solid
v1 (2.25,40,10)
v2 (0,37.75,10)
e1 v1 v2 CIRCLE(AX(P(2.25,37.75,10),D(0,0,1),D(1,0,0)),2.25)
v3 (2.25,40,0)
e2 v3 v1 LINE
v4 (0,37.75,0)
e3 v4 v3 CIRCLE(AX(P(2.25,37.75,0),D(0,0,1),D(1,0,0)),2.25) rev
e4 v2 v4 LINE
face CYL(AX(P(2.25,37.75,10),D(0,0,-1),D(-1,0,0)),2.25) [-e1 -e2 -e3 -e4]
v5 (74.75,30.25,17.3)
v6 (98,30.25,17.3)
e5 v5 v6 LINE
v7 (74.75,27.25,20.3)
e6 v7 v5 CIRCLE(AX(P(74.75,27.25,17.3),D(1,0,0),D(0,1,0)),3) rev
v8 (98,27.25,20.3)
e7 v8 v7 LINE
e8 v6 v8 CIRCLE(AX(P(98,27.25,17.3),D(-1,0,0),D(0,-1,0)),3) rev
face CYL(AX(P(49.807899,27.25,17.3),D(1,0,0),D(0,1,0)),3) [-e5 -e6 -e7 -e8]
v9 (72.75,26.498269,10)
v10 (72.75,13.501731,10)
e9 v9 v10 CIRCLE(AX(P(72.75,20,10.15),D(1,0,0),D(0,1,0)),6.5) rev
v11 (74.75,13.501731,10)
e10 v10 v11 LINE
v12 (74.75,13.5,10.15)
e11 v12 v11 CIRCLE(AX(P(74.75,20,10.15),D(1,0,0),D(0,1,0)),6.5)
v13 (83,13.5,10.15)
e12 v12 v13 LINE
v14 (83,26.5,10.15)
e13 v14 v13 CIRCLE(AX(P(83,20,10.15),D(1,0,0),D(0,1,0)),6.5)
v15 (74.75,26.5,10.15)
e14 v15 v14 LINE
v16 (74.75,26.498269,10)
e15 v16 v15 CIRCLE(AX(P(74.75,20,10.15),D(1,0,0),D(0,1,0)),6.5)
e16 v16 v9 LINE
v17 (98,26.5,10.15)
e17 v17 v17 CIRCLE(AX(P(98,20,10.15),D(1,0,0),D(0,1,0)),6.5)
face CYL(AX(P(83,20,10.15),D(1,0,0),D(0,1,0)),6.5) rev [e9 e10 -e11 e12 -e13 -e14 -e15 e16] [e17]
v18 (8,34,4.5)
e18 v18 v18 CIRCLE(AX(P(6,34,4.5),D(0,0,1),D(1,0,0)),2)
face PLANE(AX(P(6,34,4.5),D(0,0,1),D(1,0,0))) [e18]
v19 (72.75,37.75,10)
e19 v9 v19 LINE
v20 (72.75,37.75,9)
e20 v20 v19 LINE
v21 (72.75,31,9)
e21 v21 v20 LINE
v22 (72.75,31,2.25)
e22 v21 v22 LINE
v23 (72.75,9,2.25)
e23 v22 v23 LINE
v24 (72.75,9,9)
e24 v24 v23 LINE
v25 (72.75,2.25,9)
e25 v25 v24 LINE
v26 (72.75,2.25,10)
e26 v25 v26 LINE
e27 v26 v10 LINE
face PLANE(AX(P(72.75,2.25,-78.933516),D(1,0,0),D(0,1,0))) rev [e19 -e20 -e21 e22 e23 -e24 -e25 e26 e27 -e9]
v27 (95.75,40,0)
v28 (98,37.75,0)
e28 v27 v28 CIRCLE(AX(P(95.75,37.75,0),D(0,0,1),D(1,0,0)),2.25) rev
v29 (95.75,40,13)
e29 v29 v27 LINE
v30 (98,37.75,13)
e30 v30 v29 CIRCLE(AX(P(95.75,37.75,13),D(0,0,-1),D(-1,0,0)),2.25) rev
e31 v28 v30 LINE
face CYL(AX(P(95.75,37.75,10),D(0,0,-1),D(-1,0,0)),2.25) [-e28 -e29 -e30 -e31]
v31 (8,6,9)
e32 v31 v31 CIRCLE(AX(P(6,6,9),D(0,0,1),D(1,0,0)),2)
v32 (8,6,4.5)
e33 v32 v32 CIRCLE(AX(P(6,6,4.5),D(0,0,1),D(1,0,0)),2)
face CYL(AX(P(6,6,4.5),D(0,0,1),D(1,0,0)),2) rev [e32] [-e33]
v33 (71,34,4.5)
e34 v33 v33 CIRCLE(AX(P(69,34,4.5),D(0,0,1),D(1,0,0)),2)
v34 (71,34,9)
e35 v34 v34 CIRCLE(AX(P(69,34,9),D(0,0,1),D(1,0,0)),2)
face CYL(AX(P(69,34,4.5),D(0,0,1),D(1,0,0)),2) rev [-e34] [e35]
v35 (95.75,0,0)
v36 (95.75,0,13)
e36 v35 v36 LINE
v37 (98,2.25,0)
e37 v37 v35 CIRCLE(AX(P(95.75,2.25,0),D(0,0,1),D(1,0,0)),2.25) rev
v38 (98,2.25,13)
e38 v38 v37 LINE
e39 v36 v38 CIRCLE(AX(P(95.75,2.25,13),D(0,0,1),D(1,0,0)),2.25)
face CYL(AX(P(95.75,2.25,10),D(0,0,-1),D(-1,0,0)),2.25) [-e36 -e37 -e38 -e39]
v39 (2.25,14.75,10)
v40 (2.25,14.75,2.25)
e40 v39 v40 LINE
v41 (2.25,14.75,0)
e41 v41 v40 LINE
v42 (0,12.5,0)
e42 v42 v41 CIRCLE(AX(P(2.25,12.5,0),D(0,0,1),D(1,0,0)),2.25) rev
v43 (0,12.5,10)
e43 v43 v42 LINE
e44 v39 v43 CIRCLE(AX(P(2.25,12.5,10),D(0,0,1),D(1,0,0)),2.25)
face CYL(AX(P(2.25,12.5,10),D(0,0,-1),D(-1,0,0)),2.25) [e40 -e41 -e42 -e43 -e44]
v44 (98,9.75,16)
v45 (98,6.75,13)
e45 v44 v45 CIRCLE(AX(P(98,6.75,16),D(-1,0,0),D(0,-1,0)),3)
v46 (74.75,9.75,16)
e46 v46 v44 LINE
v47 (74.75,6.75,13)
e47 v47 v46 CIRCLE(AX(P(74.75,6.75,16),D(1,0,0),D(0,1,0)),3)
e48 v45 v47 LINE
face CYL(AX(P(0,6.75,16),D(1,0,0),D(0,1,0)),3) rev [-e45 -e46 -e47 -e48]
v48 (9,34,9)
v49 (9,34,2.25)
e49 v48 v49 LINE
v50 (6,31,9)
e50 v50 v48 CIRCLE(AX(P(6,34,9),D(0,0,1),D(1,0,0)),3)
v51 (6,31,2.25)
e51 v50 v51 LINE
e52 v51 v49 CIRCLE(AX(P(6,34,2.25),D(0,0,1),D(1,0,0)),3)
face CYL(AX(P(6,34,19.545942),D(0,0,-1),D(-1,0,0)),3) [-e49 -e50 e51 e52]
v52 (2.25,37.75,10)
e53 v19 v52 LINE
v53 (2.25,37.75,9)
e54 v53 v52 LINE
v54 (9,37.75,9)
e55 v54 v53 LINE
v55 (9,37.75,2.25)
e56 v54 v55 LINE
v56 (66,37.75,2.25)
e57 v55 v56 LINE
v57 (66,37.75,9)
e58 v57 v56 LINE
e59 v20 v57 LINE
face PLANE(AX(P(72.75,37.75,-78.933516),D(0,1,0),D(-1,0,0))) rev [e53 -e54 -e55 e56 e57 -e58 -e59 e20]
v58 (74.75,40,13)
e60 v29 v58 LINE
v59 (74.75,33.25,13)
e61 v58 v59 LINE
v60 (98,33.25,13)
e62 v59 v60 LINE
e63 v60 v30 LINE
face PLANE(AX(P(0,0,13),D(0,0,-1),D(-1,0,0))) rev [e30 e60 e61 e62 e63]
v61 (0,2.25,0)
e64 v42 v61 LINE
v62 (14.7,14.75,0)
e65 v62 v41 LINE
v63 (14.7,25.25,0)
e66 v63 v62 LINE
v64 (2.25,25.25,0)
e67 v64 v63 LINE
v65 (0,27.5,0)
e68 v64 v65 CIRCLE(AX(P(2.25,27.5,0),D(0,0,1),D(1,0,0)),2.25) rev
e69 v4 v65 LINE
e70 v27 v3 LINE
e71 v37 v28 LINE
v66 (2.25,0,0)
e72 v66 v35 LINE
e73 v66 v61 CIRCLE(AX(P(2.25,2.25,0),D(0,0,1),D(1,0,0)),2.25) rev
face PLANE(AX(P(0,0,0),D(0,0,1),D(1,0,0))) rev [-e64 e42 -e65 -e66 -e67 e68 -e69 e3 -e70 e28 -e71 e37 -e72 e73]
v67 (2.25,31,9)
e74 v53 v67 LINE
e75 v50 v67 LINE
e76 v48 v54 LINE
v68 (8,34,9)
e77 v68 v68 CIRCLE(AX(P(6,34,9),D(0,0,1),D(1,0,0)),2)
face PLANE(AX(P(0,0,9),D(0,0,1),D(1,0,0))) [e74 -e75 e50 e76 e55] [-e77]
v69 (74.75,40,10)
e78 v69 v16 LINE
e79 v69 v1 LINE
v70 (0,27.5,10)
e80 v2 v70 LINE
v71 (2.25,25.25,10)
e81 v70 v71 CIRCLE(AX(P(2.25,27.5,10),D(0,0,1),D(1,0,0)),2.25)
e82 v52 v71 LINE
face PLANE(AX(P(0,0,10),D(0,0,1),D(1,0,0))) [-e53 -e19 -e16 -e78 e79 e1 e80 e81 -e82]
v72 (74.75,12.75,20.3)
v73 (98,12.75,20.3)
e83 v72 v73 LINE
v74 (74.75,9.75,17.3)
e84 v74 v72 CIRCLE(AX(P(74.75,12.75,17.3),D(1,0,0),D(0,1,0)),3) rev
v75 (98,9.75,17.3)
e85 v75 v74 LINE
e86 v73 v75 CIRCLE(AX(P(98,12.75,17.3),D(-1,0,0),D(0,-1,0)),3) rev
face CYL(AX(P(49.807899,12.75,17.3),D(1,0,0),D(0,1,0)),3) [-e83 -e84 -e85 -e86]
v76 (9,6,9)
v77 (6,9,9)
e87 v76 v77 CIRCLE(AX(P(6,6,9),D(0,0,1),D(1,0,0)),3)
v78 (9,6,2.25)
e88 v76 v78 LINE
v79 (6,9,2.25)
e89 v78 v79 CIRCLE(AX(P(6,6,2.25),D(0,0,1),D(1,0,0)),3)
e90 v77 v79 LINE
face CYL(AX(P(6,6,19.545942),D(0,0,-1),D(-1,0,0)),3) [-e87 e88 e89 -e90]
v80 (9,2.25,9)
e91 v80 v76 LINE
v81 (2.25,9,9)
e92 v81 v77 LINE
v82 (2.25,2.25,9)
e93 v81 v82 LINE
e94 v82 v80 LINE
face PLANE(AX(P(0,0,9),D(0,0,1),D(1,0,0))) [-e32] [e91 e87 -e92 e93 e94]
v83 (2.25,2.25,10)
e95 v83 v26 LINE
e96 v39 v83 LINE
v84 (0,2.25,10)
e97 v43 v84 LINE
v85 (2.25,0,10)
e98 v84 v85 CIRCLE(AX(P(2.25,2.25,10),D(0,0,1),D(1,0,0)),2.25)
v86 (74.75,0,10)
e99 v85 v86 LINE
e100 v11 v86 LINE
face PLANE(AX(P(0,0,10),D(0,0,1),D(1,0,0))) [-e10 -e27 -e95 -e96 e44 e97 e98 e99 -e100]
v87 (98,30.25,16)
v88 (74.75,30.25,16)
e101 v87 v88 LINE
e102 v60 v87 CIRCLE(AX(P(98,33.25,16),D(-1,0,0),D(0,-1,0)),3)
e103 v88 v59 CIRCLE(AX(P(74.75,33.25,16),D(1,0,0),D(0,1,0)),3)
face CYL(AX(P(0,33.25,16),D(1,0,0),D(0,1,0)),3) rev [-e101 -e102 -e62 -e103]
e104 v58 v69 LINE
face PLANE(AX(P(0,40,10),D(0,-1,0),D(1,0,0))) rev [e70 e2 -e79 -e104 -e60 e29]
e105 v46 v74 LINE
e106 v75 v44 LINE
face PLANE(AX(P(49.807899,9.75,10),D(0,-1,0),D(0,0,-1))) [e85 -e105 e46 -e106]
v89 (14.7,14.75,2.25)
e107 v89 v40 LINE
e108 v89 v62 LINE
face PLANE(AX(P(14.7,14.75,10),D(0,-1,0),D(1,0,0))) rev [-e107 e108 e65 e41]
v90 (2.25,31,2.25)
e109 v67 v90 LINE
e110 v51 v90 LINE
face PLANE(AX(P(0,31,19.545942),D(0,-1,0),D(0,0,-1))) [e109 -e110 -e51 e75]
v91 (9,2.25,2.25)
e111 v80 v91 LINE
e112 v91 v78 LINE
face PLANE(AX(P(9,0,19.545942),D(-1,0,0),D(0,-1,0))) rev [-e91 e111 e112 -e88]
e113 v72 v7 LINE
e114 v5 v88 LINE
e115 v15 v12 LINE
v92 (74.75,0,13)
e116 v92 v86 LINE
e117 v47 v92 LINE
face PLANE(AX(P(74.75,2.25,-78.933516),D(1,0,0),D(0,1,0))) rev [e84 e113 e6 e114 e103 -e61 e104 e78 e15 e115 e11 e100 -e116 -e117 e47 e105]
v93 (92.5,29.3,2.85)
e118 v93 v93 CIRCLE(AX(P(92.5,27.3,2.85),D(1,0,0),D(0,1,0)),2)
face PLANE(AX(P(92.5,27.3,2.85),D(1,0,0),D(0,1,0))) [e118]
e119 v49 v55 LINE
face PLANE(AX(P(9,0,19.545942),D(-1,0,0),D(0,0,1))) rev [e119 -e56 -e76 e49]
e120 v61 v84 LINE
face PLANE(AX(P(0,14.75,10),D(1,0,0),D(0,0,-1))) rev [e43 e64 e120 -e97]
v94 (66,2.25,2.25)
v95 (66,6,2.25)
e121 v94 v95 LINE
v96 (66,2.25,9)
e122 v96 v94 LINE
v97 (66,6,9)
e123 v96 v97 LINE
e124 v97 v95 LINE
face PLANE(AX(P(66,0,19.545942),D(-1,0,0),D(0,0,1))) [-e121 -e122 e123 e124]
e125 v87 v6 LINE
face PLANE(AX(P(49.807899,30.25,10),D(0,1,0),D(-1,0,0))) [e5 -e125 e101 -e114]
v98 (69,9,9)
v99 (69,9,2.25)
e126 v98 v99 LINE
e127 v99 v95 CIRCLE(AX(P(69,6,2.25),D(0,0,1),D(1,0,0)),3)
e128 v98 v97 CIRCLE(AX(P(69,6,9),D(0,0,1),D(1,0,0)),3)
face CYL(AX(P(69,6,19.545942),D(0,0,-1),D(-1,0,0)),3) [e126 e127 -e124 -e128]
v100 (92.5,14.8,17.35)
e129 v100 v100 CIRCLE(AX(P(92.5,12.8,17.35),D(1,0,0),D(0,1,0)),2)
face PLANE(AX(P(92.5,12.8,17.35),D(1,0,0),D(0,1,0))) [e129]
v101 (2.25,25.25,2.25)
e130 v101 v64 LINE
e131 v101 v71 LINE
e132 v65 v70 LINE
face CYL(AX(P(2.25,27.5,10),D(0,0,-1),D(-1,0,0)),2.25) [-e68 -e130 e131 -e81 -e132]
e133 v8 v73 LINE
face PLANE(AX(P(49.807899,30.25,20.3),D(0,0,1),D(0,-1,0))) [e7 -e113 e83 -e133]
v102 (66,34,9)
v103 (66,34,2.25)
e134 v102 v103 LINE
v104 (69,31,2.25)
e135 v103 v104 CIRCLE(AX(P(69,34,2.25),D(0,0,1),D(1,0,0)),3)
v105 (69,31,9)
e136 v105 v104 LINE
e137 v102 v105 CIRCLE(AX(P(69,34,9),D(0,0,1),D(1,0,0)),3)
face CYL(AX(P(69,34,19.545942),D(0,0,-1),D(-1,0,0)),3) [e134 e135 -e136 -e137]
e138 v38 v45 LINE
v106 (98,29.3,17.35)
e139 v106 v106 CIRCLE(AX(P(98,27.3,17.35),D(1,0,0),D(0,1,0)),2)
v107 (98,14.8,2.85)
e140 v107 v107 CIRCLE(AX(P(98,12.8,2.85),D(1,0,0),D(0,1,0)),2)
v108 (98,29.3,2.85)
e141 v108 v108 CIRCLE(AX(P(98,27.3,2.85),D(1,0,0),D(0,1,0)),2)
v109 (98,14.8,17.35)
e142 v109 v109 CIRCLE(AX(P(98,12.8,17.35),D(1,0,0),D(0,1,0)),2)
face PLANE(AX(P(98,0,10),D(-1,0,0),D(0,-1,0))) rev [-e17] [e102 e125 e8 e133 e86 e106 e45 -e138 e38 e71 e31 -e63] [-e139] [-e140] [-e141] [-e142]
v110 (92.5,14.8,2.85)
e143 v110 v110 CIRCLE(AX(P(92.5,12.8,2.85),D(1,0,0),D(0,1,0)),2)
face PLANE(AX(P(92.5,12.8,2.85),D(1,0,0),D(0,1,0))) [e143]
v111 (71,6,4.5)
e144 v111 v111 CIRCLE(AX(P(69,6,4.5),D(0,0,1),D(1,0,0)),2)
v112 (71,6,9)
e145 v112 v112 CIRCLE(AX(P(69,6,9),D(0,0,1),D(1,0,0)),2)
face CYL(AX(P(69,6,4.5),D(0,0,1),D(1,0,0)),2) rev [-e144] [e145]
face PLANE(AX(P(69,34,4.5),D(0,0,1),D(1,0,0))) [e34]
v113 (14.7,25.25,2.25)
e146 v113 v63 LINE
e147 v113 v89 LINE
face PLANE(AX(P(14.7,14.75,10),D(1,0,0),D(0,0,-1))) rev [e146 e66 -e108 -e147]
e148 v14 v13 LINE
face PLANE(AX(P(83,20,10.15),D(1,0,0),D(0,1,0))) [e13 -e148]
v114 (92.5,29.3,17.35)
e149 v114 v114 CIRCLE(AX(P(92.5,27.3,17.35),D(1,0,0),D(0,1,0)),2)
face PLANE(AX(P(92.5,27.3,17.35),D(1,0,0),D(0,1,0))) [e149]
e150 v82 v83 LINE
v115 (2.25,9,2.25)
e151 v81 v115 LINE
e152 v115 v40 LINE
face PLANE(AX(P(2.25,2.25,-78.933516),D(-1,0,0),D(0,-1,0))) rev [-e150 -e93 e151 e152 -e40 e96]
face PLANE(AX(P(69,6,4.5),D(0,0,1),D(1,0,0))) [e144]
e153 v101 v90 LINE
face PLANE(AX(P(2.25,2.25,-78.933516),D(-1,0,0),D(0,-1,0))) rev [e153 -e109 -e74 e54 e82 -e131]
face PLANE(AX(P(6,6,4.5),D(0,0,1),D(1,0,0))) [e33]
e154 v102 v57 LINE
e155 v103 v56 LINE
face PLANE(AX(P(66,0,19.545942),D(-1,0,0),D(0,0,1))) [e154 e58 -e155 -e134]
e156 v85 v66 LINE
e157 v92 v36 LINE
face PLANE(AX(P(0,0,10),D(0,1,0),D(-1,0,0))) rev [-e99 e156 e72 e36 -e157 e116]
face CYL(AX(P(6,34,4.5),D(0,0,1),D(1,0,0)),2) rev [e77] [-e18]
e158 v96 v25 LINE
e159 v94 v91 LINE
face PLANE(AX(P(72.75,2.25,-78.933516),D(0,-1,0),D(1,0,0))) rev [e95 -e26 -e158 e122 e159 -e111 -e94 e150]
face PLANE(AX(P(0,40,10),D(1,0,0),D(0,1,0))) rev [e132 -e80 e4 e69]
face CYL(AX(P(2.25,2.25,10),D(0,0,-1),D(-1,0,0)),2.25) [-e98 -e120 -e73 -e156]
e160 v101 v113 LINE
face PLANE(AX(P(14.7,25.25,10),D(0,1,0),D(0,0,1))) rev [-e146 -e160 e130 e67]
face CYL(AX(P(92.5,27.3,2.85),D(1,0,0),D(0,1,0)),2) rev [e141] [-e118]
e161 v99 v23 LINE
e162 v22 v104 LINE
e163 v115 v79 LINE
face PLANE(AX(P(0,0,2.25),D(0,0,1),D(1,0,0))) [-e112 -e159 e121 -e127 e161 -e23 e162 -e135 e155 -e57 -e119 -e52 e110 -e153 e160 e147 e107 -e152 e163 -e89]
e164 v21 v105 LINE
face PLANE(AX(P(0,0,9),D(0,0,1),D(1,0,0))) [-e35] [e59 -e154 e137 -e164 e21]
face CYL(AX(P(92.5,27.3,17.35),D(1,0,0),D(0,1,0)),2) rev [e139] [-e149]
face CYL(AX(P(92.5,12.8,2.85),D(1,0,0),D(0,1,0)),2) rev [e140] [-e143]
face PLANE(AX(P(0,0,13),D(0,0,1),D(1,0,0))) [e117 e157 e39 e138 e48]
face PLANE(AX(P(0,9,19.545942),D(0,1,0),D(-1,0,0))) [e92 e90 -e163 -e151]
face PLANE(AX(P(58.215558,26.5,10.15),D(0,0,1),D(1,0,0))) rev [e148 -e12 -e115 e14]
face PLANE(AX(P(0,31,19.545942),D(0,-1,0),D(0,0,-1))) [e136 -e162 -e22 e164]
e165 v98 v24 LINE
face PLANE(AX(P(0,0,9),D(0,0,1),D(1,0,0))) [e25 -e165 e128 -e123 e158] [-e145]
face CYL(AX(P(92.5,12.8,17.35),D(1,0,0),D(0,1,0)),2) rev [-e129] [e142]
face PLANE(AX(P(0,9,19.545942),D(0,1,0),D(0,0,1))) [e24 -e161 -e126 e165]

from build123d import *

# Parameters (mm, degrees)
BODY_DEPTH          = 10
PCB_RECESS_DEPTH    = 7.75
SKETCH11_R          = 3.000000000000004
SKETCH11_R_2        = 2.999999999999999
SKETCH11_R_3        = 3.000000000000008
SKETCH11_R_4        = 3.0000000000000084
PCB_BOSS_DEPTH      = 6.75
FILLET2_R           = 2.25
BOSS_EXTRUDE2_DEPTH = 23.25
BOSS_EXTRUDE3_DEPTH = 3
SKETCH25_R          = 6.5
CUT_EXTRUDE9_DEPTH  = 15
CUT_EXTRUDE10_DEPTH = 10.25
FILLET7_R           = 3
FILLET8_R           = 2.25
SKETCH27_R          = 2.0000000000000067
SKETCH27_R_2        = 2.000000000000003
SKETCH27_R_3        = 2
SKETCH27_R_4        = 1.9999999999999996
CUT_EXTRUDE11_DEPTH = 5.5
SKETCH12_R          = 1.9999999999999991
SKETCH12_R_2        = 1.9999999999999967
SKETCH12_R_3        = 1.9999999999999996
CUT_EXTRUDE5_DEPTH  = 4.5


with BuildPart() as part:
    # Sketch4 → body (new body)
    with BuildSketch(Plane.XY):
        Polygon((0, 40), (1.73e-15, 25.25), (14.7, 25.25), (14.7, 14.750000000000002), (0, 14.75), (0, 0), (97.99999999999999, 6.94e-15), (98, 40.00000000000001), align=None)
    extrude(amount=BODY_DEPTH)

    # Sketch10 → pcb-recess (cut)
    with BuildSketch(Plane.XY.offset(10)):
        Polygon((72.75000000000001, 2.250000000000009), (2.2500000000000018, 2.2500000000000004), (2.2500000000000044, 37.74999999999999), (72.75, 37.75000000000001), align=None)
    extrude(amount=-PCB_RECESS_DEPTH, mode=Mode.SUBTRACT)

    # Sketch11 → pcb-boss (add)
    with BuildSketch(Plane.XY.offset(2.25)):
        with Locations((6.000000000000004, 34)):
            Circle(SKETCH11_R)
        with BuildLine():
            Line((2.250000000000004, 31), (6.000000000000004, 31))
            ThreePointArc((6.0000000000000036, 30.999999999999996), (3.8786796564403594, 36.121320343559645), (9.000000000000009, 34))
            Line((9.000000000000007, 34), (9.000000000000007, 37.74999999999999))
            Line((9.000000000000007, 37.74999999999999), (2.2500000000000044, 37.74999999999999))
            Line((2.2500000000000044, 37.74999999999999), (2.250000000000004, 31))
        make_face()
        with BuildLine():
            Line((2.2500000000000018, 2.2500000000000004), (9.000000000000007, 2.2500000000000013))
            Line((9.000000000000007, 2.2500000000000013), (9.000000000000007, 6.000000000000005))
            ThreePointArc((9.000000000000007, 6.000000000000004), (3.8786796564403647, 3.8786796564403634), (6.000000000000007, 9.000000000000004))
            Line((6.000000000000007, 9.000000000000005), (2.250000000000002, 9.000000000000014))
            Line((2.250000000000002, 9.000000000000014), (2.2500000000000018, 2.25))
        make_face()
        with Locations((6.000000000000007, 6.000000000000005)):
            Circle(SKETCH11_R_2)
        with Locations((69, 6.000000000000005)):
            Circle(SKETCH11_R_3)
        with BuildLine():
            Line((72.75000000000001, 2.250000000000009), (72.75000000000001, 9.000000000000012))
            Line((72.75000000000001, 9.000000000000012), (69, 9.000000000000012))
            ThreePointArc((69, 9.000000000000014), (71.12132034355965, 8.121320343559653), (72.00000000000001, 6.000000000000005))
            ThreePointArc((72.00000000000001, 6.000000000000004), (69, 2.9999999999999973), (65.99999999999999, 6.000000000000005))
            Line((66, 6.000000000000005), (66, 2.250000000000008))
            Line((66, 2.250000000000008), (72.75000000000001, 2.250000000000009))
        make_face()
        with BuildLine():
            Line((72.75, 37.75000000000001), (66, 37.75000000000001))
            Line((66, 37.75000000000001), (66, 34))
            ThreePointArc((65.99999999999999, 34), (69, 37.00000000000001), (72.00000000000001, 34))
            ThreePointArc((72.00000000000001, 34), (71.12132034355965, 31.87867965644035), (69, 30.999999999999993))
            Line((69, 30.999999999999993), (72.75, 30.999999999999993))
            Line((72.75, 30.999999999999993), (72.75, 37.75000000000001))
        make_face()
        with Locations((69, 34)):
            Circle(SKETCH11_R_4)
    extrude(amount=PCB_BOSS_DEPTH)

    # Fillet2
    fillet2_edges = [part.edges().sort_by_distance(p)[0] for p in [
        (0, 14.75, 5),
        (1.73e-15, 25.25, 5),
    ]]
    fillet(fillet2_edges, radius=FILLET2_R - 0.0001)  # a hair under: the kernel refuses the full size

    # Sketch23 → Boss-Extrude2 (add)
    with BuildSketch(Plane(origin=(97.99999999999999, -3.4e-14, 0), x_dir=(0, 0, -1), z_dir=(1, -3.5e-16, 0))):
        Polygon((-10, 30.250000000000025), (-20.299999999999997, 30.25000000000003), (-20.299999999999994, 9.750000000000027), (-9.999999999999998, 9.75000000000002), align=None)
    extrude(amount=-BOSS_EXTRUDE2_DEPTH)

    # Sketch24 → Boss-Extrude3 (add)
    with BuildSketch(Plane.XY.offset(10)):
        Polygon((74.75, 30.25), (98, 30.25), (98, 40.00000000000001), (74.75, 39.99999999999999), align=None)
        Polygon((74.75000000000001, 9.749999999999995), (97.99999999999999, 9.749999999999995), (97.99999999999999, 6.94e-15), (74.75000000000001, -6.94e-15), align=None)
    extrude(amount=BOSS_EXTRUDE3_DEPTH)

    # Sketch25 → Cut-Extrude9 (cut)
    with BuildSketch(Plane(origin=(97.99999999999999, -3.4e-14, 0), x_dir=(0, 0, -1), z_dir=(1, -3.5e-16, 0))):
        with Locations(Location((-10.149999999999999, 20.000000000000025, 0), (0, 0, 90))):
            Circle(SKETCH25_R)
    extrude(amount=-CUT_EXTRUDE9_DEPTH, mode=Mode.SUBTRACT)

    # Sketch26 → Cut-Extrude10 (cut)
    with BuildSketch(Plane(origin=(83, -2.88e-14, 0), x_dir=(0, 0, -1), z_dir=(1, -3.5e-16, 0))):
        with BuildLine():
            Line((-10.149999999999999, 26.500000000000025), (-10.149999999999999, 13.500000000000027))
            ThreePointArc((-10.149999999999999, 13.500000000000027), (-3.6499999999999986, 20.000000000000025), (-10.149999999999999, 26.500000000000025))
        make_face()
    extrude(amount=-CUT_EXTRUDE10_DEPTH, mode=Mode.SUBTRACT)

    # Fillet7
    fillet7_edges = [part.edges().sort_by_distance(p)[0] for p in [
        (86.37499999999999, 9.749999999999996, 20.299999999999994),
        (86.375, 30.249999999999996, 20.299999999999997),
        (86.375, 30.25, 13),
        (86.375, 9.749999999999995, 13),
    ]]
    fillet(fillet7_edges, radius=FILLET7_R)

    # Fillet8
    fillet8_edges = [part.edges().sort_by_distance(p)[0] for p in [
        (0, 40, 5),
        (98, 40.00000000000001, 6.5),
        (97.99999999999999, 6.94e-15, 6.5),
        (0, 0, 5),
    ]]
    fillet(fillet8_edges, radius=FILLET8_R)

    # Sketch27 → Cut-Extrude11 (cut)
    with BuildSketch(Plane(origin=(97.99999999999999, -3.4e-14, 0), x_dir=(0, 0, -1), z_dir=(1, -3.5e-16, 0))):
        with Locations(Location((-17.350000000000005, 27.300000000000026, 0), (0, 0, 90))):
            Circle(SKETCH27_R)
        with Locations(Location((-2.850000000000002, 27.300000000000026, 0), (0, 0, 90))):
            Circle(SKETCH27_R_2)
        with Locations(Location((-2.8499999999999948, 12.800000000000026, 0), (0, 0, 90))):
            Circle(SKETCH27_R_3)
        with Locations(Location((-17.349999999999998, 12.800000000000026, 0), (0, 0, 90))):
            Circle(SKETCH27_R_4)
    extrude(amount=-CUT_EXTRUDE11_DEPTH, mode=Mode.SUBTRACT)

    # Sketch12 → Cut-Extrude5 (cut)
    with BuildSketch(Plane.XY.offset(9.000000000000002)):
        with Locations((6.000000000000004, 34)):
            Circle(SKETCH12_R)
        with Locations((69, 34)):
            Circle(SKETCH12_R_2)
        with Locations((69, 6.000000000000005)):
            Circle(SKETCH12_R_2)
        with Locations((6.000000000000007, 6.000000000000005)):
            Circle(SKETCH12_R_3)
    extrude(amount=-CUT_EXTRUDE5_DEPTH, mode=Mode.SUBTRACT)


solid = part.part
